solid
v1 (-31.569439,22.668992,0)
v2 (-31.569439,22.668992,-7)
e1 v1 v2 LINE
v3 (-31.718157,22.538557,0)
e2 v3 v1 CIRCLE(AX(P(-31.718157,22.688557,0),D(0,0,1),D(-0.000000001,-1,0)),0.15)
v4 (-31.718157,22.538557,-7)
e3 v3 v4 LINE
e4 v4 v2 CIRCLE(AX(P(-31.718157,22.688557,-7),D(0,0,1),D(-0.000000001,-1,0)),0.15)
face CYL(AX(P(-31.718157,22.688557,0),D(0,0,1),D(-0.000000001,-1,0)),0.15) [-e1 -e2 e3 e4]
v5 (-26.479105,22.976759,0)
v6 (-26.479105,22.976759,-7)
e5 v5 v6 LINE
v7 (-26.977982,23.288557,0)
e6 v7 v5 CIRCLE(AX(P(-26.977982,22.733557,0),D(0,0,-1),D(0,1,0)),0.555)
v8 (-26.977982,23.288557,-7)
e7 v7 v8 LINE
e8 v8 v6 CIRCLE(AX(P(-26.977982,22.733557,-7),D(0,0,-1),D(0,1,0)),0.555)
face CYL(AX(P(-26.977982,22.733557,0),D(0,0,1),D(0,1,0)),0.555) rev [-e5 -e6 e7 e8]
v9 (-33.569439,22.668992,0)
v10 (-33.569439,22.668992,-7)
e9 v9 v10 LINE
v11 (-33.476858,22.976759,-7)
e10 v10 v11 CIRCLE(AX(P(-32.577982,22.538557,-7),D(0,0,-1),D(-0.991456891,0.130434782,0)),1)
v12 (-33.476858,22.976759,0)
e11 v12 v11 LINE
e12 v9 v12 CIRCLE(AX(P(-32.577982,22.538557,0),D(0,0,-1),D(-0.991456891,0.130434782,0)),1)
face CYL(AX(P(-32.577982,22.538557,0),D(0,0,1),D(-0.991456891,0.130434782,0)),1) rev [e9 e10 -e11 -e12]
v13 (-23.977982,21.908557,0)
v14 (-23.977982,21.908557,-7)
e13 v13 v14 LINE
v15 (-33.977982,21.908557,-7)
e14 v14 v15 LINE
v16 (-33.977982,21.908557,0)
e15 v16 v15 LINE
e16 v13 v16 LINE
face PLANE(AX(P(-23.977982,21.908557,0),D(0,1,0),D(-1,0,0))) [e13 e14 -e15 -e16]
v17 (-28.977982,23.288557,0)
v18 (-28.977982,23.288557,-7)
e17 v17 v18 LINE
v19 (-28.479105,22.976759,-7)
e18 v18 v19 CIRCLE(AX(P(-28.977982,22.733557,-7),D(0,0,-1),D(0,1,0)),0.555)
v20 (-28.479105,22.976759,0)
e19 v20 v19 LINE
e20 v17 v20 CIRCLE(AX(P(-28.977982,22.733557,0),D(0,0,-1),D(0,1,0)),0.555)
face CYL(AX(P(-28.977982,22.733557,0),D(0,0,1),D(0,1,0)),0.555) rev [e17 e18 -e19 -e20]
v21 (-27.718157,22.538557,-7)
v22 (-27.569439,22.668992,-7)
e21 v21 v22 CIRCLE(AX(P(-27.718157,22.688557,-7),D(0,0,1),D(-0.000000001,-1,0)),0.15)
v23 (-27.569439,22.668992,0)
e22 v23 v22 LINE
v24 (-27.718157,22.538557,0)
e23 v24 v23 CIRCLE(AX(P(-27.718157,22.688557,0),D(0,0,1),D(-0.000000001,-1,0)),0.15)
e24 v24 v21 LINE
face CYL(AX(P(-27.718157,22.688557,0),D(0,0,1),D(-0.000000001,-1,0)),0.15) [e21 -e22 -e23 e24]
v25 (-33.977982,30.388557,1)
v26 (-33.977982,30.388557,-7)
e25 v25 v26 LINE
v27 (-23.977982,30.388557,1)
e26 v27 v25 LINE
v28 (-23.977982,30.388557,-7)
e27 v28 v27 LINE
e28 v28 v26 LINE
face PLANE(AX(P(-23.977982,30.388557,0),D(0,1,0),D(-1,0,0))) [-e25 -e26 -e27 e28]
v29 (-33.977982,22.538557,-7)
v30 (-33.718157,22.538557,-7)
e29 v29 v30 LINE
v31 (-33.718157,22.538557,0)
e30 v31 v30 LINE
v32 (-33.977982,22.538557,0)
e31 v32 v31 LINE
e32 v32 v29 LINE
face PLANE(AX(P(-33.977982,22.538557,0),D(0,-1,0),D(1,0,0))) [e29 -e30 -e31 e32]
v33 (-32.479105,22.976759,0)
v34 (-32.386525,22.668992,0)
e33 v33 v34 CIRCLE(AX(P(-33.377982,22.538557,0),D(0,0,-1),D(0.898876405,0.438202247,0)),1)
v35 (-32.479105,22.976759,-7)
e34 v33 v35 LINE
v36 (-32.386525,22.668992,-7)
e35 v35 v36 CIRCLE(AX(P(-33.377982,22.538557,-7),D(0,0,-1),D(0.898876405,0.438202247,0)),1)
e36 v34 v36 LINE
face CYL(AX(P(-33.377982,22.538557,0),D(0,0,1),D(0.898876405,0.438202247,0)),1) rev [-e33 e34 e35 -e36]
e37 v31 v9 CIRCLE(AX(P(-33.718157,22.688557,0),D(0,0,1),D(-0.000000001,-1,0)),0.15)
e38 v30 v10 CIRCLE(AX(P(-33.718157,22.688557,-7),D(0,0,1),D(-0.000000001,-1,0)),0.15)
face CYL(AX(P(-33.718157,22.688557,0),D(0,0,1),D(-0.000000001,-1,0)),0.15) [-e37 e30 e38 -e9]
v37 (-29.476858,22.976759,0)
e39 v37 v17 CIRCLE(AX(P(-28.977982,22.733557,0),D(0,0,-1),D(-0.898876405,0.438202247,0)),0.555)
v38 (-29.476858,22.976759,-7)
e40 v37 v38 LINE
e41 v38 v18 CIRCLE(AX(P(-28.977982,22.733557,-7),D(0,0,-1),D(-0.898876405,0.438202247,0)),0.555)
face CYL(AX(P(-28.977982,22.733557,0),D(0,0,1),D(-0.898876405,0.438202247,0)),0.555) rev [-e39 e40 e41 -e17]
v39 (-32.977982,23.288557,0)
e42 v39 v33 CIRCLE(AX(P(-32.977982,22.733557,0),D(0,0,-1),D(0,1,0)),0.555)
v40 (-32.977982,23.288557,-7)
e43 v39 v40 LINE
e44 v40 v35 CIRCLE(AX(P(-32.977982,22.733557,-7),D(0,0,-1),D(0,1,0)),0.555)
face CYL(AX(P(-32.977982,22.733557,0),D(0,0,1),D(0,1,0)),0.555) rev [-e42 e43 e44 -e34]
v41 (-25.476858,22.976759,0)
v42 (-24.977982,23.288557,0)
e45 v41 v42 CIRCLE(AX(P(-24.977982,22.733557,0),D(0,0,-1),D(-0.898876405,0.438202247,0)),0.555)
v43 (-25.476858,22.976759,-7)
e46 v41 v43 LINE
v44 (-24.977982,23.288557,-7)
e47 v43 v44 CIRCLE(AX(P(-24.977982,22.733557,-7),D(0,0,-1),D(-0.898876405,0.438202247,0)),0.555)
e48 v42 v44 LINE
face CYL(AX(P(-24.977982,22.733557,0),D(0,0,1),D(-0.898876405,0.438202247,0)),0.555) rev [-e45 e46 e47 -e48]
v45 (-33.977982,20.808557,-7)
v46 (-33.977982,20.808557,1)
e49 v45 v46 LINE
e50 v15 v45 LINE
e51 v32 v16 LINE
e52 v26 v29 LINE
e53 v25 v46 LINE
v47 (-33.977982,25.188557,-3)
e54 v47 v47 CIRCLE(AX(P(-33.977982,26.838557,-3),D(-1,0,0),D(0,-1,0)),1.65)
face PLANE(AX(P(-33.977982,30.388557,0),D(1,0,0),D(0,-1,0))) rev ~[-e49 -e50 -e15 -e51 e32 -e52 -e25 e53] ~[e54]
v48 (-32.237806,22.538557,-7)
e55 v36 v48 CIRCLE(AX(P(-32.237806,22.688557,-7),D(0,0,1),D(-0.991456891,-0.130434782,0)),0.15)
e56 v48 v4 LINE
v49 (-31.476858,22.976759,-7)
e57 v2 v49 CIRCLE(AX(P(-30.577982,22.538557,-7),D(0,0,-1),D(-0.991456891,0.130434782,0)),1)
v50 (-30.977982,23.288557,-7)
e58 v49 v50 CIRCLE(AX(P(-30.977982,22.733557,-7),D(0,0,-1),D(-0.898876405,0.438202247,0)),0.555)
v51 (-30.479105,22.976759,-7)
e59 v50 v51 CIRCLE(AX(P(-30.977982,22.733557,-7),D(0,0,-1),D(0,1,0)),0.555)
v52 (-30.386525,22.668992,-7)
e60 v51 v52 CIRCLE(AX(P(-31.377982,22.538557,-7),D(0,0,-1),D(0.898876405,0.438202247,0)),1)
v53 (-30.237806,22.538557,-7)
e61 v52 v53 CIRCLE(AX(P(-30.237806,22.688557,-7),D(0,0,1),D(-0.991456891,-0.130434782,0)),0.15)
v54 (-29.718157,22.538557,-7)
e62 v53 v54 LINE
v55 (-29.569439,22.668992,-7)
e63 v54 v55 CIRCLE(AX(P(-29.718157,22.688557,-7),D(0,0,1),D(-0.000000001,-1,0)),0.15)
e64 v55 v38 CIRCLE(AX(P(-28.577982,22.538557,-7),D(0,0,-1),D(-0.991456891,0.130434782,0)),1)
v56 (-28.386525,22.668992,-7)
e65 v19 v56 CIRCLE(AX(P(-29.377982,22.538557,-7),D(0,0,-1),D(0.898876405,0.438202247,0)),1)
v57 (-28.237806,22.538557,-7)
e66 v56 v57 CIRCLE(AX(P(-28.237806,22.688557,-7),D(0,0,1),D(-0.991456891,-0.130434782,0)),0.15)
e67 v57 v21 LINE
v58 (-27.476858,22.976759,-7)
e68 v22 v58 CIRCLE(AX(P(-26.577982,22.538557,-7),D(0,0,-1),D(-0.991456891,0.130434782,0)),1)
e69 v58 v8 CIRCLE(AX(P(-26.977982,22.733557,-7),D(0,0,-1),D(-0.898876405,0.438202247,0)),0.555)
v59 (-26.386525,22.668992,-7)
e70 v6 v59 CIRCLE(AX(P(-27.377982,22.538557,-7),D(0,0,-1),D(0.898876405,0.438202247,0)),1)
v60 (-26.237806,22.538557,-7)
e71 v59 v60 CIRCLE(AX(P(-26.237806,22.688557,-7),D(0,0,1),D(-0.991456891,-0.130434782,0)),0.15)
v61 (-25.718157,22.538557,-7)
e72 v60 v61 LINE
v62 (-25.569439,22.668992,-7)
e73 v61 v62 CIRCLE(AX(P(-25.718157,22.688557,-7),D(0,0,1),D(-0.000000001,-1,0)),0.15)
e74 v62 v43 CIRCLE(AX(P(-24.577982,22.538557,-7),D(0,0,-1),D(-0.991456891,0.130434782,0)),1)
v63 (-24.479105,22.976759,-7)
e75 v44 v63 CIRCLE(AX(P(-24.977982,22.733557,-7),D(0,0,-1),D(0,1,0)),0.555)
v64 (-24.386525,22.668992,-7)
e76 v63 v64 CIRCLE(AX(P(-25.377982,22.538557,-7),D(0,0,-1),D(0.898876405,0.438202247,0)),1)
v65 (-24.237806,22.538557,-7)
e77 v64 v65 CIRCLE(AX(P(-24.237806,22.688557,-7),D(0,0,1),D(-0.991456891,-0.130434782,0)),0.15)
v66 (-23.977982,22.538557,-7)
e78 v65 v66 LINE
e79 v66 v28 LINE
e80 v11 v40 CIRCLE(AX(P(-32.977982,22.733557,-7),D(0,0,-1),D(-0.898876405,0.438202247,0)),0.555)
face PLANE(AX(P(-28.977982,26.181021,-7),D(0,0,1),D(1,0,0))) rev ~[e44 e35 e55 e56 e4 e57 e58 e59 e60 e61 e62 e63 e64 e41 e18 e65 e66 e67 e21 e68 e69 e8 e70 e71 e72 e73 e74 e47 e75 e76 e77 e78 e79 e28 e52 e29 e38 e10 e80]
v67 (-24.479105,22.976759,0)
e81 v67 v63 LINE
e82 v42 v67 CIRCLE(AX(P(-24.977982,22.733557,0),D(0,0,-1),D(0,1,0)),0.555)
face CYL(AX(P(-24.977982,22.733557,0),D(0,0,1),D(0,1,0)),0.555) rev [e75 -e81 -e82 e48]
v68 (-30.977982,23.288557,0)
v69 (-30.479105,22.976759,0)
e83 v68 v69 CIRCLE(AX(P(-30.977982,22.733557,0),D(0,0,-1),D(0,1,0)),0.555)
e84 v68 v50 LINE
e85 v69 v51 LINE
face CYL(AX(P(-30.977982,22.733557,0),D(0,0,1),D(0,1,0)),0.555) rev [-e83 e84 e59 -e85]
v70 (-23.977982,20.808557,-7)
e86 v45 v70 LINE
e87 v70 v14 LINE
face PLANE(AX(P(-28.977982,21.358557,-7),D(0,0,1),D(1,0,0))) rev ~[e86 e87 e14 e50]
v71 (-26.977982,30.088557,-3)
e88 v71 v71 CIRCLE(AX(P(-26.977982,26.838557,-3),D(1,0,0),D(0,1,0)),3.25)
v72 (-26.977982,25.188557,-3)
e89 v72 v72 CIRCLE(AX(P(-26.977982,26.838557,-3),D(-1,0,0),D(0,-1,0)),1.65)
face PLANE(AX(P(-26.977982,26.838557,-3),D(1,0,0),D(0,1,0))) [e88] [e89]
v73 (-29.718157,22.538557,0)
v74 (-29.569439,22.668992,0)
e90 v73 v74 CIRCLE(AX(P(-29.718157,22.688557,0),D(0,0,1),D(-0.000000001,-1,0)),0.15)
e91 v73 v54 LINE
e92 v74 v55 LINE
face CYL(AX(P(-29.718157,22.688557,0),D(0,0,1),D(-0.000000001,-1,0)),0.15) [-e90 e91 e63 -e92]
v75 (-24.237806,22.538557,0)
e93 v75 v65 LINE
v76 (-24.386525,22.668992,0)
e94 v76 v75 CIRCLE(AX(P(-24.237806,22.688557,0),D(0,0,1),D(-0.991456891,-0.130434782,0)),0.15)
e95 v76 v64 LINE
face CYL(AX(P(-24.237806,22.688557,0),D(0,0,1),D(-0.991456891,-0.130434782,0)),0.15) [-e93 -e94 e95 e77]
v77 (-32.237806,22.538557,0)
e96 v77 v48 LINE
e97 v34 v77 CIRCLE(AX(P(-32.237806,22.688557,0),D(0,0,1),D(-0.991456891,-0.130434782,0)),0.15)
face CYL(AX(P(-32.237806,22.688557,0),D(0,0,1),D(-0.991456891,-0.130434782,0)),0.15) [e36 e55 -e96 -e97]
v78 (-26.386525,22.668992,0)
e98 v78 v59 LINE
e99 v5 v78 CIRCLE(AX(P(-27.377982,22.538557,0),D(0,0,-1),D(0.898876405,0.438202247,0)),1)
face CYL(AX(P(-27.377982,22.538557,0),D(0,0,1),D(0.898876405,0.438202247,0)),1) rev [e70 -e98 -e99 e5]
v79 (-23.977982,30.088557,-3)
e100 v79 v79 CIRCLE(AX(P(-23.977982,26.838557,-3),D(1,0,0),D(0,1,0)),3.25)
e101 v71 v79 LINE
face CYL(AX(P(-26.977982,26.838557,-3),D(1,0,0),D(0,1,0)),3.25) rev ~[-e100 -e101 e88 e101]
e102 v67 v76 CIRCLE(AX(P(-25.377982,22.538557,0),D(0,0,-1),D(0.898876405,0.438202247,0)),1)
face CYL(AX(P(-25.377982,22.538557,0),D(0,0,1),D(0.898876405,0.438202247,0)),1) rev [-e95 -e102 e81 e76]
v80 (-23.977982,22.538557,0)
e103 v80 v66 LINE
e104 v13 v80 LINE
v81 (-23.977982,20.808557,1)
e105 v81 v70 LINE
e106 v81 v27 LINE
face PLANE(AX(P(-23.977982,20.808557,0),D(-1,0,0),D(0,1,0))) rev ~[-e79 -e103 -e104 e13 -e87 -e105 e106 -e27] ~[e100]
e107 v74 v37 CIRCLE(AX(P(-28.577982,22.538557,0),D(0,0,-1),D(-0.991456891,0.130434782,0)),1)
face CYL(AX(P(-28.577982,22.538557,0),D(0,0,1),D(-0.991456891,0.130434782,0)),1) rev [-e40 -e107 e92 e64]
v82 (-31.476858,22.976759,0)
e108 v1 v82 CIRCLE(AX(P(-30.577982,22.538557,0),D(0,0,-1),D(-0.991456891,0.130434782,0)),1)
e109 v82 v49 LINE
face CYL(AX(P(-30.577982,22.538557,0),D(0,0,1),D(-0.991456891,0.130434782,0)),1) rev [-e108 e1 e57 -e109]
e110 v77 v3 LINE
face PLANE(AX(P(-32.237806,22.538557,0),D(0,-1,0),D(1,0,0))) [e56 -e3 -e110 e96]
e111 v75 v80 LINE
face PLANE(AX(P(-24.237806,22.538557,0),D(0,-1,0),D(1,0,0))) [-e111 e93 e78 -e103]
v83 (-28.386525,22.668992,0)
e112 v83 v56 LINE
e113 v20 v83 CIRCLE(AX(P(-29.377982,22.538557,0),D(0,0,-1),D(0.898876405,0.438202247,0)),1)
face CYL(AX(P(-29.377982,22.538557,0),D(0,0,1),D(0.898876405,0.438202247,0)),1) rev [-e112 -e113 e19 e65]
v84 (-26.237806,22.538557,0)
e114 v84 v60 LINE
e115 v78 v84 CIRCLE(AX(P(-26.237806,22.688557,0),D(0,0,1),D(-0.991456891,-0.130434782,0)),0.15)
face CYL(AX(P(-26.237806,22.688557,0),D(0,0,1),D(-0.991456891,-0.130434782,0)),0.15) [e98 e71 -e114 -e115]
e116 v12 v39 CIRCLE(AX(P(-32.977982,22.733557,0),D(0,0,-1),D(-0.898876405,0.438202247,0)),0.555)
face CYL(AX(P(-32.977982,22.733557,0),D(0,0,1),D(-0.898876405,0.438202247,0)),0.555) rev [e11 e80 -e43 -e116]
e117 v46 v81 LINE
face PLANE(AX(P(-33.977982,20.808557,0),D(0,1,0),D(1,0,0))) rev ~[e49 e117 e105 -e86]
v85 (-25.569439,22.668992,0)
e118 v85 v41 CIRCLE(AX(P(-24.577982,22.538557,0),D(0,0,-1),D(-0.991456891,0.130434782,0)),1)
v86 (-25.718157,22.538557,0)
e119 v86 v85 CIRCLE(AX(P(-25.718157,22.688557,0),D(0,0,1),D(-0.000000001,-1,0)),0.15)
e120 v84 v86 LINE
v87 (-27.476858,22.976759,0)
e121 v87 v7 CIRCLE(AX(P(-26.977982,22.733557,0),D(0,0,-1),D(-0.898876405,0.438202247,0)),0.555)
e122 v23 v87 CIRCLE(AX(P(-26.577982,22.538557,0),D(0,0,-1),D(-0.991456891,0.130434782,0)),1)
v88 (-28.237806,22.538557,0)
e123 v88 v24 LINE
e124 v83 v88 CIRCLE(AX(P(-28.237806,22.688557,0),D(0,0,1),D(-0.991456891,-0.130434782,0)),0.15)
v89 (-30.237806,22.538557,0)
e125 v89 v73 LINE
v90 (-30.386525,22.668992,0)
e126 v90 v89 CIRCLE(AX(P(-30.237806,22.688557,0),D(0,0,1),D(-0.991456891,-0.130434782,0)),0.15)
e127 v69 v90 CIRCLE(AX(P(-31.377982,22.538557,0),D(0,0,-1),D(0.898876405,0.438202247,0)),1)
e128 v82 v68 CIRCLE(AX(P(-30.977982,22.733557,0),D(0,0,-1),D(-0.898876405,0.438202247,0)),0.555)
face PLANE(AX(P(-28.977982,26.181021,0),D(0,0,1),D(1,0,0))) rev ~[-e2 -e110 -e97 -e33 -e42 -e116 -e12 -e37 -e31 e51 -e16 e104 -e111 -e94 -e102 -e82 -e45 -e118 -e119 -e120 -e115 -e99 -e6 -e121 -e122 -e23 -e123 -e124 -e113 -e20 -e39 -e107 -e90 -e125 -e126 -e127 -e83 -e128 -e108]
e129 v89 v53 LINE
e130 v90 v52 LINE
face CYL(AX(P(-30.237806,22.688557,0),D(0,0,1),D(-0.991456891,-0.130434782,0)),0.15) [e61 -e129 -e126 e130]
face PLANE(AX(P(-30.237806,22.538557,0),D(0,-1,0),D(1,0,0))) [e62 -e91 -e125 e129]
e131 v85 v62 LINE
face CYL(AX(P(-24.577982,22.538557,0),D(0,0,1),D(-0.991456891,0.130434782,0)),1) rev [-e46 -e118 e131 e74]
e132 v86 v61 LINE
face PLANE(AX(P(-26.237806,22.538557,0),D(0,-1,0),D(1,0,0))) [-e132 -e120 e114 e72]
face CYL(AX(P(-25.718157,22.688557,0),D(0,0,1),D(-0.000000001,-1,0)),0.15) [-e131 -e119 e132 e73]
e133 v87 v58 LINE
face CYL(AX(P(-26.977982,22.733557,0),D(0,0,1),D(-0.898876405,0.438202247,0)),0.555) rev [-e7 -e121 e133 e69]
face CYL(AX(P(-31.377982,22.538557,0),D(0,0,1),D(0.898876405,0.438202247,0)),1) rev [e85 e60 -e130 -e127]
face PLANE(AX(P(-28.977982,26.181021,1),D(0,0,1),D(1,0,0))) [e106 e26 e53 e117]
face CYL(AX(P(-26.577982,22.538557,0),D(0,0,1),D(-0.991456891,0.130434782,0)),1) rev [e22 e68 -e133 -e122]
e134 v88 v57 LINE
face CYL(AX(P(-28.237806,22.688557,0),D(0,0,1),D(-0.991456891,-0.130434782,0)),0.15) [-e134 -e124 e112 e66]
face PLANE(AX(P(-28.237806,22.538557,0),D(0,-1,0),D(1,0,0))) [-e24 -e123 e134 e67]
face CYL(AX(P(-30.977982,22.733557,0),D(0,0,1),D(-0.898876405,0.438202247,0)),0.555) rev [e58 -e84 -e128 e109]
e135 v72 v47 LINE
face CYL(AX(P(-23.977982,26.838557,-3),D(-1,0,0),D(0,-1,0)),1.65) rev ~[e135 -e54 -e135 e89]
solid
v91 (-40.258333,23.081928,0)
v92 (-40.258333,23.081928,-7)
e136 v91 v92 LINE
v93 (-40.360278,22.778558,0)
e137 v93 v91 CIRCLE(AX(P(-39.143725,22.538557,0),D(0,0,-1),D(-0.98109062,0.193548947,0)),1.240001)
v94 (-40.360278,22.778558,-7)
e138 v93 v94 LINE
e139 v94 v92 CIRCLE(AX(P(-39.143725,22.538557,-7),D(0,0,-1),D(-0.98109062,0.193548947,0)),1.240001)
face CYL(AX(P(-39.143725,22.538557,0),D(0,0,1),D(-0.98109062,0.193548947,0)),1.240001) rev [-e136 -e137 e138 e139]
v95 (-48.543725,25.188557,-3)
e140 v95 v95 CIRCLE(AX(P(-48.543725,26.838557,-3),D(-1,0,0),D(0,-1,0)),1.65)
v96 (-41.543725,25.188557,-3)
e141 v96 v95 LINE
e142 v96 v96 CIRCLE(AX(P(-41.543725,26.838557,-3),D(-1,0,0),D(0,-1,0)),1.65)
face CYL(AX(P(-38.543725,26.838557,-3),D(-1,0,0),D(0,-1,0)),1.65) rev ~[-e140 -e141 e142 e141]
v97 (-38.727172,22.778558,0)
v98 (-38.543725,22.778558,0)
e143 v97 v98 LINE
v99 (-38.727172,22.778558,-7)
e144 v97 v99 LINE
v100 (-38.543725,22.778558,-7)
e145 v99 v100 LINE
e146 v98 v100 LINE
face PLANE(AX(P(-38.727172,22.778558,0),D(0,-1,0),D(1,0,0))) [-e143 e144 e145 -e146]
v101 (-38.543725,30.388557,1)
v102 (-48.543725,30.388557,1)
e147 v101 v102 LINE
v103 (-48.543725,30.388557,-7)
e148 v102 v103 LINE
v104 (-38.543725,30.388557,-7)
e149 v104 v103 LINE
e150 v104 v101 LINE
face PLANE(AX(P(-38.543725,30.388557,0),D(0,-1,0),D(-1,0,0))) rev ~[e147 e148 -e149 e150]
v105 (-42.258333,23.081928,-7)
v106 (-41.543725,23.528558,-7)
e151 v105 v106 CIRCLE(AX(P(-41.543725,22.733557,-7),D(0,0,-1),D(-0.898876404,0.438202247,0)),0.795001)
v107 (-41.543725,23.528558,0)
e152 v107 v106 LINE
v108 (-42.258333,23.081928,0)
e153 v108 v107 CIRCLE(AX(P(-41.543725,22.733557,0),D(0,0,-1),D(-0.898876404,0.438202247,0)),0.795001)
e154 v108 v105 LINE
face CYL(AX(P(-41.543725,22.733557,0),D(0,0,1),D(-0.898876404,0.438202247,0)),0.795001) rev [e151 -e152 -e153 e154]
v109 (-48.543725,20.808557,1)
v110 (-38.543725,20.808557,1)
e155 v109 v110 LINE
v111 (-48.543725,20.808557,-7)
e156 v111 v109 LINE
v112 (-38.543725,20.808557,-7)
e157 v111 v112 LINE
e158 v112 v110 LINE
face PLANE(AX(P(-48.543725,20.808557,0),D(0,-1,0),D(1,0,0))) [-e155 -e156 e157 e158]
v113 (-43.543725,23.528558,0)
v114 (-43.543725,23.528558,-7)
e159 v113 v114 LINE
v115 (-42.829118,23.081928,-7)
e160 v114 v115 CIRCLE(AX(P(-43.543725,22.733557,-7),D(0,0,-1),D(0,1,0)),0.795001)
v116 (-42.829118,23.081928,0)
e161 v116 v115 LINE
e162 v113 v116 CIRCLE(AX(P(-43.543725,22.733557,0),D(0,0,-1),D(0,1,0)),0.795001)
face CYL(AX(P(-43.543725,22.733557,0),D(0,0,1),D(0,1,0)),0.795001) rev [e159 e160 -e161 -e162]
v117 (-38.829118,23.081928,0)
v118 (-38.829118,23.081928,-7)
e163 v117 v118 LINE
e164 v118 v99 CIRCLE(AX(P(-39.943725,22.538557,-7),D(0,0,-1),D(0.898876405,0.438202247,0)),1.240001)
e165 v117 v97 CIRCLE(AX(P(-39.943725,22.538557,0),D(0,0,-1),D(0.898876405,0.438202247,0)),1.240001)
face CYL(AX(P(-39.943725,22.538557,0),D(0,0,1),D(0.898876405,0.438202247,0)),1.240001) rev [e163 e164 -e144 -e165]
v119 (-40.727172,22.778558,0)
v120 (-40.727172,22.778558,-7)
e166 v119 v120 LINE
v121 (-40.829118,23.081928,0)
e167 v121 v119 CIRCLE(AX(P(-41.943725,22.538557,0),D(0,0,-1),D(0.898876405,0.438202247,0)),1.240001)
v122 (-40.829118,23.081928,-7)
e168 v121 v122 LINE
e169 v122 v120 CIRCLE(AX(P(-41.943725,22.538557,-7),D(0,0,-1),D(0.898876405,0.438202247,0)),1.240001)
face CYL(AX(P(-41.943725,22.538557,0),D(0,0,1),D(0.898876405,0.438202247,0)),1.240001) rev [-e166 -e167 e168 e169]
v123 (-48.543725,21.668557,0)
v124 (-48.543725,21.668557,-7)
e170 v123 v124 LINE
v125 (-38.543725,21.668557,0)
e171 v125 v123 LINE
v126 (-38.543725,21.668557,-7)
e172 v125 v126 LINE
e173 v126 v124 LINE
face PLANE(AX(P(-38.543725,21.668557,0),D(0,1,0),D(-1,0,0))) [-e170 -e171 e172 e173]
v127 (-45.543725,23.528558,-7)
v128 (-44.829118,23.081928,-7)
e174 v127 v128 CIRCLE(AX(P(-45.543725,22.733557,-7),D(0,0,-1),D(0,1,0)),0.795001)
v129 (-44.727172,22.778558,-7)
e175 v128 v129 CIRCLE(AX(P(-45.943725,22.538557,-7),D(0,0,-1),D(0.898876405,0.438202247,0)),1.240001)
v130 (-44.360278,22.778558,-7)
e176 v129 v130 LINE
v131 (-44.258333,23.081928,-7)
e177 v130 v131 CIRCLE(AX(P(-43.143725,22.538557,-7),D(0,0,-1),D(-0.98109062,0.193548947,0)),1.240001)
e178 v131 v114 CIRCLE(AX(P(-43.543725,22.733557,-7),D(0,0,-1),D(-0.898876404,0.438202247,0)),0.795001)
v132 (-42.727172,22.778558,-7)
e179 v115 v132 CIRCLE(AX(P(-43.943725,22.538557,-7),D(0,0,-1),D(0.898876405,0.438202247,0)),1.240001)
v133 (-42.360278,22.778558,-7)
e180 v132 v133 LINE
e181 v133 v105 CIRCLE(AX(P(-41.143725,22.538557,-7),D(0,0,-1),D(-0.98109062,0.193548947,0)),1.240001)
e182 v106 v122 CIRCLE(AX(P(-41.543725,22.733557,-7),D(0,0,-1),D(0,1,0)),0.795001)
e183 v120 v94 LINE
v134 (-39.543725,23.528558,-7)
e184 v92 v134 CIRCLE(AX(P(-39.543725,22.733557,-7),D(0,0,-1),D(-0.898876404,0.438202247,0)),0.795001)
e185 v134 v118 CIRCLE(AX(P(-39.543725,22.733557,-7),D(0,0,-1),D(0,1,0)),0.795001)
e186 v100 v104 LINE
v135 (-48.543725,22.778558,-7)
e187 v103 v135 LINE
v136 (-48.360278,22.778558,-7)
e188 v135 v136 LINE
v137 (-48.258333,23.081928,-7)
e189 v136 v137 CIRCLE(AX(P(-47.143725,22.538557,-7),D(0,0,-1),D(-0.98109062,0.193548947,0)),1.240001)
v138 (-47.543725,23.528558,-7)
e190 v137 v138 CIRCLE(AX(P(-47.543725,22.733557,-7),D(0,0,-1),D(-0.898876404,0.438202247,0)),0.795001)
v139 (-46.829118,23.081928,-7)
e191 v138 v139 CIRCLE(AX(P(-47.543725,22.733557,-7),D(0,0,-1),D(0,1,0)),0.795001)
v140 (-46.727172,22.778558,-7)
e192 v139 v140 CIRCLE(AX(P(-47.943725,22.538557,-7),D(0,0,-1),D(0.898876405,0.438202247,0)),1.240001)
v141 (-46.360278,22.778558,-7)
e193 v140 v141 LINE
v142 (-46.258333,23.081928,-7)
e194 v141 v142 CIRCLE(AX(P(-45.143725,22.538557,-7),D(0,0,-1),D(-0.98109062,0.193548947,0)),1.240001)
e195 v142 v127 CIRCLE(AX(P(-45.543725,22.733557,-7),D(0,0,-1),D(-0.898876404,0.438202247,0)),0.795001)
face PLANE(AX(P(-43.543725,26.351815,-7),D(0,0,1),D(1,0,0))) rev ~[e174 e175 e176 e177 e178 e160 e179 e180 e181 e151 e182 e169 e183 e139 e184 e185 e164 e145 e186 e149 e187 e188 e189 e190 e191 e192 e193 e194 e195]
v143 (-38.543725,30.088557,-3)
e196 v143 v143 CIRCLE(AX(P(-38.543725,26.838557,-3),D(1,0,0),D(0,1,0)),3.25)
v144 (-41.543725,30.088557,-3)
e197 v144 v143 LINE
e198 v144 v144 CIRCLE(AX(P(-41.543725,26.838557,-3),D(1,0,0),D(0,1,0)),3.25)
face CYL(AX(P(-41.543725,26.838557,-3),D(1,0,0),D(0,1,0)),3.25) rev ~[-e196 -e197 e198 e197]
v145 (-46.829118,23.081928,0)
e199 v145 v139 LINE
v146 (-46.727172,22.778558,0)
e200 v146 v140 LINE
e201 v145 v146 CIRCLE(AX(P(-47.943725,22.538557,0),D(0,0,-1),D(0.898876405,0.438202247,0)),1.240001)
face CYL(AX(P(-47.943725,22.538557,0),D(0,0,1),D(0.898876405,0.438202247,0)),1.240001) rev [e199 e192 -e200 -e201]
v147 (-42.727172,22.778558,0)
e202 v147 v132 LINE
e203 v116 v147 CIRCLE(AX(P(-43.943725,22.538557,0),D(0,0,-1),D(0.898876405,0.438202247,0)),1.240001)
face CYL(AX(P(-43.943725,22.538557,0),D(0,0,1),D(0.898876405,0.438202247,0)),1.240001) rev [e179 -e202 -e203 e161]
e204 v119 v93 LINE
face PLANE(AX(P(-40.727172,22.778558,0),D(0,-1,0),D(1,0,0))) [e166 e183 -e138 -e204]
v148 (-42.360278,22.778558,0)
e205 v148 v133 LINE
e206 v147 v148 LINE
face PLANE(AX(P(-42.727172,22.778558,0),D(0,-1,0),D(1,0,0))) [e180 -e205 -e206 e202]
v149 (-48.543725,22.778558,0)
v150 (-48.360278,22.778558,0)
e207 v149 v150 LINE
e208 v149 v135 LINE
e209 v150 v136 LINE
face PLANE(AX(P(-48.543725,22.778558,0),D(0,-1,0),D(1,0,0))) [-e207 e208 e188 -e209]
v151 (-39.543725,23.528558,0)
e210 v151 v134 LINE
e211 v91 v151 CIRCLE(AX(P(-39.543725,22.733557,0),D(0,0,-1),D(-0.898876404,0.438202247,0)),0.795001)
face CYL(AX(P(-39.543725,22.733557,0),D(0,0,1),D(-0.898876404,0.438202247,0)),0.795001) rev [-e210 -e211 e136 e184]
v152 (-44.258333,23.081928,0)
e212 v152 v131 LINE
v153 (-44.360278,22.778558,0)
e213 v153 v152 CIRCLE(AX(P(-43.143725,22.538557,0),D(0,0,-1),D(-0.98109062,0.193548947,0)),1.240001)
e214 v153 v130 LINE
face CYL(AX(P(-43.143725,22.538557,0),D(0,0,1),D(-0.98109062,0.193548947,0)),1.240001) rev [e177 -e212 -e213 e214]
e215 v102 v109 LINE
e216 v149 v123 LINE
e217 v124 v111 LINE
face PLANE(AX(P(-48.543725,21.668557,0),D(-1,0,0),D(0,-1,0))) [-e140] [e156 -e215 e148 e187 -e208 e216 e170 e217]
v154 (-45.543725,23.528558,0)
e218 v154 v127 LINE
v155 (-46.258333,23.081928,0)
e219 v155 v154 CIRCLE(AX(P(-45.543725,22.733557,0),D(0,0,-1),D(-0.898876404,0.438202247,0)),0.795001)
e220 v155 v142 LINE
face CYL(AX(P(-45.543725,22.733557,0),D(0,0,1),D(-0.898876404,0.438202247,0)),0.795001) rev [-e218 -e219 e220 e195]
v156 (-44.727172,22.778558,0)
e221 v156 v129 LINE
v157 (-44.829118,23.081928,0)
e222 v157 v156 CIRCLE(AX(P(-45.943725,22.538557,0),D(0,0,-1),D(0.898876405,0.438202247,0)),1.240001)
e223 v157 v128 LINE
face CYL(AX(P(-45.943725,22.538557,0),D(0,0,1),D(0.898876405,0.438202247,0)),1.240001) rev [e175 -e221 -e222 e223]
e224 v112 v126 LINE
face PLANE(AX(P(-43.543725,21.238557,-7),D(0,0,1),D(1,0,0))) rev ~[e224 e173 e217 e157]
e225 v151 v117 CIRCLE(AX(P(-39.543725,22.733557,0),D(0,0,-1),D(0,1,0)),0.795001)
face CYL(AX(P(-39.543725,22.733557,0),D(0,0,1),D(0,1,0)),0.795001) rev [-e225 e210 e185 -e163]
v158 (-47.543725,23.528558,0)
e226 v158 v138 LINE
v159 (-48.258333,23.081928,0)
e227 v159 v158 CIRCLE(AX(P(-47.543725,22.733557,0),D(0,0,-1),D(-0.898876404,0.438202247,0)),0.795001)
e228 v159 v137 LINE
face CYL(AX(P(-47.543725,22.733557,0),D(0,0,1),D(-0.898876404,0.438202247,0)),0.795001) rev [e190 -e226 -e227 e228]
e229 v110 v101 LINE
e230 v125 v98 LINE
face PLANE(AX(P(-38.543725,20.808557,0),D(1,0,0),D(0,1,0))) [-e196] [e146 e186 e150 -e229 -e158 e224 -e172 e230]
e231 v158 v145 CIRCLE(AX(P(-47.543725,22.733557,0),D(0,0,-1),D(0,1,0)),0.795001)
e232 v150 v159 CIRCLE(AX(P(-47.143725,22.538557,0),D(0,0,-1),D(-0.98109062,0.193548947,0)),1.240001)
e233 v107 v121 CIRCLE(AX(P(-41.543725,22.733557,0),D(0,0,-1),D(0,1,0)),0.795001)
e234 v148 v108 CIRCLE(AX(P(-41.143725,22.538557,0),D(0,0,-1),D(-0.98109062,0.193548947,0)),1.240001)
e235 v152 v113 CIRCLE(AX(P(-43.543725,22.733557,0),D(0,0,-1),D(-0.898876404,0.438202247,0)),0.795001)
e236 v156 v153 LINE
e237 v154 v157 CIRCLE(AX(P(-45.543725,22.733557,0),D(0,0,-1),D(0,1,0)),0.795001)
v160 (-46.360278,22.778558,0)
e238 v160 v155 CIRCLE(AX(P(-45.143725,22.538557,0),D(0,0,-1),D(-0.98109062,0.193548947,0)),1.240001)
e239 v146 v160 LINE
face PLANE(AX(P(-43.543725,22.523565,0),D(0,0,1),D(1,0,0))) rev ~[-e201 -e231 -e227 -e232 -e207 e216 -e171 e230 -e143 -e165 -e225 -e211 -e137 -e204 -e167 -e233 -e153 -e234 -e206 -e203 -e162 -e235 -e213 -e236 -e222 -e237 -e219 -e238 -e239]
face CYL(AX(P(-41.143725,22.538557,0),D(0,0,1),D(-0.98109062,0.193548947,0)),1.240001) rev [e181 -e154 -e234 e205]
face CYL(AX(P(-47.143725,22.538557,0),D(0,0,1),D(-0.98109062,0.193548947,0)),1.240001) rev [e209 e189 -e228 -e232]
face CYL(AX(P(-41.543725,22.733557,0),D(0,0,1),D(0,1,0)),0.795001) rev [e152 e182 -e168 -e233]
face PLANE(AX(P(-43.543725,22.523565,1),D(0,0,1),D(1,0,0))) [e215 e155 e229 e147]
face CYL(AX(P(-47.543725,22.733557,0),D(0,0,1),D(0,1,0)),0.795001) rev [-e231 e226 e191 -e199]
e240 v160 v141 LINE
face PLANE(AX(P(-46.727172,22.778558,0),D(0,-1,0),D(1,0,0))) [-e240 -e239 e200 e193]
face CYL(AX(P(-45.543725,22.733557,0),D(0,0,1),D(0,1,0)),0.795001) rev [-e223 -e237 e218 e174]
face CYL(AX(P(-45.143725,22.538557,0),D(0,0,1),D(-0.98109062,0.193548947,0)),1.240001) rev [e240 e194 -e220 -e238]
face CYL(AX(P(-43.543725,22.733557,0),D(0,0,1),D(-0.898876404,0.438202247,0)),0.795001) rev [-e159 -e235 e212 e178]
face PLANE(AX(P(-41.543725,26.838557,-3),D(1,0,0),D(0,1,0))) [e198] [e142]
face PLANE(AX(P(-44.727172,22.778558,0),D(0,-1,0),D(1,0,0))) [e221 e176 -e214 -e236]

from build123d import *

# Parameters (mm, degrees)
F1_DEPTH       = 1
F2_DEPTH       = 7
F4_D           = 3.3
F4_CBORE_D     = 6.5
F4_CBORE_DEPTH = 3
F6_D           = 3.3
F6_CBORE_D     = 6.5
F6_CBORE_DEPTH = 3


# Not quite as in the source:
# - a feature names something its author has since deleted; it is built from what else it names


with BuildPart() as f1:
    # F0 (on Top) → F1 (new body)
    with BuildSketch(Plane.XY):
        with BuildLine():
            ThreePointArc((-32.9779816215, 23.288556752), (-32.6838322098, 23.2041958107), (-32.479105217, 22.9767589991))
            ThreePointArc((-32.479105217, 22.9767589991), (-32.4203699072, 22.8266189059), (-32.3865247301, 22.6689915346))
            ThreePointArc((-32.3865247301, 22.6689915346), (-32.3367132674, 22.5757853402), (-32.2378061964, 22.538556752))
            Line((-32.2378061964, 22.538556752), (-31.9779816215, 22.538556752))
            Line((-31.9779816215, 22.538556752), (-31.7181570466, 22.538556752))
            ThreePointArc((-31.7181570466, 22.538556752), (-31.6192499756, 22.5757853402), (-31.5694385129, 22.6689915346))
            ThreePointArc((-31.5694385129, 22.6689915346), (-31.5355933359, 22.8266189059), (-31.476858026, 22.9767589991))
            ThreePointArc((-31.476858026, 22.9767589991), (-31.2721310332, 23.2041958107), (-30.9779816215, 23.288556752))
            ThreePointArc((-30.9779816215, 23.288556752), (-30.6838322098, 23.2041958107), (-30.479105217, 22.9767589991))
            ThreePointArc((-30.479105217, 22.9767589991), (-30.4203699072, 22.8266189059), (-30.3865247301, 22.6689915346))
            ThreePointArc((-30.3865247301, 22.6689915346), (-30.3367132674, 22.5757853402), (-30.2378061964, 22.538556752))
            Line((-30.2378061964, 22.538556752), (-29.9779816215, 22.538556752))
            Line((-29.9779816215, 22.538556752), (-29.7181570466, 22.538556752))
            ThreePointArc((-29.7181570466, 22.538556752), (-29.6192499756, 22.5757853402), (-29.5694385129, 22.6689915346))
            ThreePointArc((-29.5694385129, 22.6689915346), (-29.5355933359, 22.8266189059), (-29.476858026, 22.9767589991))
            ThreePointArc((-29.476858026, 22.9767589991), (-29.2721310332, 23.2041958107), (-28.9779816215, 23.288556752))
            ThreePointArc((-28.9779816215, 23.288556752), (-28.6838322098, 23.2041958107), (-28.479105217, 22.9767589991))
            ThreePointArc((-28.479105217, 22.9767589991), (-28.4203699072, 22.8266189059), (-28.3865247301, 22.6689915346))
            ThreePointArc((-28.3865247301, 22.6689915346), (-28.3367132674, 22.5757853402), (-28.2378061964, 22.538556752))
            Line((-28.2378061964, 22.538556752), (-27.9779816215, 22.538556752))
            Line((-27.9779816215, 22.538556752), (-27.7181570466, 22.538556752))
            ThreePointArc((-27.7181570466, 22.538556752), (-27.6192499756, 22.5757853402), (-27.5694385129, 22.6689915346))
            ThreePointArc((-27.5694385129, 22.6689915346), (-27.5355933359, 22.8266189059), (-27.476858026, 22.9767589991))
            ThreePointArc((-27.476858026, 22.9767589991), (-27.2721310332, 23.2041958107), (-26.9779816215, 23.288556752))
            ThreePointArc((-26.9779816215, 23.288556752), (-26.6838322098, 23.2041958107), (-26.479105217, 22.9767589991))
            ThreePointArc((-26.479105217, 22.9767589991), (-26.4203699072, 22.8266189059), (-26.3865247301, 22.6689915346))
            ThreePointArc((-26.3865247301, 22.6689915346), (-26.3367132674, 22.5757853402), (-26.2378061964, 22.538556752))
            Line((-26.2378061964, 22.538556752), (-25.9779816215, 22.538556752))
            Line((-25.9779816215, 22.538556752), (-25.7181570466, 22.538556752))
            ThreePointArc((-25.7181570466, 22.538556752), (-25.6192499756, 22.5757853402), (-25.5694385129, 22.6689915346))
            ThreePointArc((-25.5694385129, 22.6689915346), (-25.5355933359, 22.8266189059), (-25.476858026, 22.9767589991))
            ThreePointArc((-25.476858026, 22.9767589991), (-25.2721310332, 23.2041958107), (-24.9779816215, 23.288556752))
            ThreePointArc((-24.9779816215, 23.288556752), (-24.6838322098, 23.2041958107), (-24.479105217, 22.9767589991))
            ThreePointArc((-24.479105217, 22.9767589991), (-24.4203699072, 22.8266189059), (-24.3865247301, 22.6689915346))
            ThreePointArc((-24.3865247301, 22.6689915346), (-24.3367132674, 22.5757853402), (-24.2378061964, 22.538556752))
            Line((-24.2378061964, 22.538556752), (-23.9779816215, 22.538556752))
            Line((-23.9779816215, 22.538556752), (-23.9779816215, 30.388556752))
            Line((-23.9779816215, 30.388556752), (-33.9779816215, 30.388556752))
            Line((-33.9779816215, 30.388556752), (-33.9779816215, 22.538556752))
            Line((-33.9779816215, 22.538556752), (-33.7181570466, 22.538556752))
            ThreePointArc((-33.7181570466, 22.538556752), (-33.6192499756, 22.5757853402), (-33.5694385129, 22.6689915346))
            ThreePointArc((-33.5694385129, 22.6689915346), (-33.5355933359, 22.8266189059), (-33.476858026, 22.9767589991))
            ThreePointArc((-33.476858026, 22.9767589991), (-33.2721310332, 23.2041958107), (-32.9779816215, 23.288556752))
        make_face()
        with BuildLine():
            ThreePointArc((-32.3865247301, 22.6689915346), (-32.4203699072, 22.8266189059), (-32.479105217, 22.9767589991))
            ThreePointArc((-32.479105217, 22.9767589991), (-32.6838322098, 23.2041958107), (-32.9779816215, 23.288556752))
            ThreePointArc((-32.9779816215, 23.288556752), (-33.2721310332, 23.2041958107), (-33.476858026, 22.9767589991))
            ThreePointArc((-33.476858026, 22.9767589991), (-33.5355933359, 22.8266189059), (-33.5694385129, 22.6689915346))
            ThreePointArc((-33.5694385129, 22.6689915346), (-33.6192499756, 22.5757853402), (-33.7181570466, 22.538556752))
            Line((-33.7181570466, 22.538556752), (-33.9779816215, 22.538556752))
            Line((-33.9779816215, 22.538556752), (-33.9779816215, 21.908556752))
            Line((-33.9779816215, 21.908556752), (-31.9779816215, 21.908556752))
            Line((-31.9779816215, 21.908556752), (-29.9779816215, 21.908556752))
            Line((-29.9779816215, 21.908556752), (-27.9779816215, 21.908556752))
            Line((-27.9779816215, 21.908556752), (-25.9779816215, 21.908556752))
            Line((-25.9779816215, 21.908556752), (-23.9779816215, 21.908556752))
            Line((-23.9779816215, 21.908556752), (-23.9779816215, 22.538556752))
            Line((-23.9779816215, 22.538556752), (-24.2378061964, 22.538556752))
            ThreePointArc((-24.2378061964, 22.538556752), (-24.3367132674, 22.5757853402), (-24.3865247301, 22.6689915346))
            ThreePointArc((-24.3865247301, 22.6689915346), (-24.4203699072, 22.8266189059), (-24.479105217, 22.9767589991))
            ThreePointArc((-24.479105217, 22.9767589991), (-24.6838322098, 23.2041958107), (-24.9779816215, 23.288556752))
            ThreePointArc((-24.9779816215, 23.288556752), (-25.2721310332, 23.2041958107), (-25.476858026, 22.9767589991))
            ThreePointArc((-25.476858026, 22.9767589991), (-25.5355933359, 22.8266189059), (-25.5694385129, 22.6689915346))
            ThreePointArc((-25.5694385129, 22.6689915346), (-25.6192499756, 22.5757853402), (-25.7181570466, 22.538556752))
            Line((-25.7181570466, 22.538556752), (-25.9779816215, 22.538556752))
            Line((-25.9779816215, 22.538556752), (-26.2378061964, 22.538556752))
            ThreePointArc((-26.2378061964, 22.538556752), (-26.3367132674, 22.5757853402), (-26.3865247301, 22.6689915346))
            ThreePointArc((-26.3865247301, 22.6689915346), (-26.4203699072, 22.8266189059), (-26.479105217, 22.9767589991))
            ThreePointArc((-26.479105217, 22.9767589991), (-26.6838322098, 23.2041958107), (-26.9779816215, 23.288556752))
            ThreePointArc((-26.9779816215, 23.288556752), (-27.2721310332, 23.2041958107), (-27.476858026, 22.9767589991))
            ThreePointArc((-27.476858026, 22.9767589991), (-27.5355933359, 22.8266189059), (-27.5694385129, 22.6689915346))
            ThreePointArc((-27.5694385129, 22.6689915346), (-27.6192499756, 22.5757853402), (-27.7181570466, 22.538556752))
            Line((-27.7181570466, 22.538556752), (-27.9779816215, 22.538556752))
            Line((-27.9779816215, 22.538556752), (-28.2378061964, 22.538556752))
            ThreePointArc((-28.2378061964, 22.538556752), (-28.3367132674, 22.5757853402), (-28.3865247301, 22.6689915346))
            ThreePointArc((-28.3865247301, 22.6689915346), (-28.4203699072, 22.8266189059), (-28.479105217, 22.9767589991))
            ThreePointArc((-28.479105217, 22.9767589991), (-28.6838322098, 23.2041958107), (-28.9779816215, 23.288556752))
            ThreePointArc((-28.9779816215, 23.288556752), (-29.2721310332, 23.2041958107), (-29.476858026, 22.9767589991))
            ThreePointArc((-29.476858026, 22.9767589991), (-29.5355933359, 22.8266189059), (-29.5694385129, 22.6689915346))
            ThreePointArc((-29.5694385129, 22.6689915346), (-29.6192499756, 22.5757853402), (-29.7181570466, 22.538556752))
            Line((-29.7181570466, 22.538556752), (-29.9779816215, 22.538556752))
            Line((-29.9779816215, 22.538556752), (-30.2378061964, 22.538556752))
            ThreePointArc((-30.2378061964, 22.538556752), (-30.3367132674, 22.5757853402), (-30.3865247301, 22.6689915346))
            ThreePointArc((-30.3865247301, 22.6689915346), (-30.4203699072, 22.8266189059), (-30.479105217, 22.9767589991))
            ThreePointArc((-30.479105217, 22.9767589991), (-30.6838322098, 23.2041958107), (-30.9779816215, 23.288556752))
            ThreePointArc((-30.9779816215, 23.288556752), (-31.2721310332, 23.2041958107), (-31.476858026, 22.9767589991))
            ThreePointArc((-31.476858026, 22.9767589991), (-31.5355933359, 22.8266189059), (-31.5694385129, 22.6689915346))
            ThreePointArc((-31.5694385129, 22.6689915346), (-31.6192499756, 22.5757853402), (-31.7181570466, 22.538556752))
            Line((-31.7181570466, 22.538556752), (-31.9779816215, 22.538556752))
            Line((-31.9779816215, 22.538556752), (-32.2378061964, 22.538556752))
            ThreePointArc((-32.2378061964, 22.538556752), (-32.3367132674, 22.5757853402), (-32.3865247301, 22.6689915346))
        make_face()
        Polygon((-31.9779816215, 21.908556752), (-33.9779816215, 21.908556752), (-33.9779816215, 20.808556752), (-23.9779816215, 20.808556752), (-23.9779816215, 21.908556752), (-25.9779816215, 21.908556752), (-27.9779816215, 21.908556752), (-29.9779816215, 21.908556752), align=None)
    extrude(amount=F1_DEPTH)

    # F0 (on Top) → F2 (join)
    with BuildSketch(Plane.XY):
        with BuildLine():
            ThreePointArc((-32.9779816215, 23.288556752), (-32.6838322098, 23.2041958107), (-32.479105217, 22.9767589991))
            ThreePointArc((-32.479105217, 22.9767589991), (-32.4203699072, 22.8266189059), (-32.3865247301, 22.6689915346))
            ThreePointArc((-32.3865247301, 22.6689915346), (-32.3367132674, 22.5757853402), (-32.2378061964, 22.538556752))
            Line((-32.2378061964, 22.538556752), (-31.9779816215, 22.538556752))
            Line((-31.9779816215, 22.538556752), (-31.7181570466, 22.538556752))
            ThreePointArc((-31.7181570466, 22.538556752), (-31.6192499756, 22.5757853402), (-31.5694385129, 22.6689915346))
            ThreePointArc((-31.5694385129, 22.6689915346), (-31.5355933359, 22.8266189059), (-31.476858026, 22.9767589991))
            ThreePointArc((-31.476858026, 22.9767589991), (-31.2721310332, 23.2041958107), (-30.9779816215, 23.288556752))
            ThreePointArc((-30.9779816215, 23.288556752), (-30.6838322098, 23.2041958107), (-30.479105217, 22.9767589991))
            ThreePointArc((-30.479105217, 22.9767589991), (-30.4203699072, 22.8266189059), (-30.3865247301, 22.6689915346))
            ThreePointArc((-30.3865247301, 22.6689915346), (-30.3367132674, 22.5757853402), (-30.2378061964, 22.538556752))
            Line((-30.2378061964, 22.538556752), (-29.9779816215, 22.538556752))
            Line((-29.9779816215, 22.538556752), (-29.7181570466, 22.538556752))
            ThreePointArc((-29.7181570466, 22.538556752), (-29.6192499756, 22.5757853402), (-29.5694385129, 22.6689915346))
            ThreePointArc((-29.5694385129, 22.6689915346), (-29.5355933359, 22.8266189059), (-29.476858026, 22.9767589991))
            ThreePointArc((-29.476858026, 22.9767589991), (-29.2721310332, 23.2041958107), (-28.9779816215, 23.288556752))
            ThreePointArc((-28.9779816215, 23.288556752), (-28.6838322098, 23.2041958107), (-28.479105217, 22.9767589991))
            ThreePointArc((-28.479105217, 22.9767589991), (-28.4203699072, 22.8266189059), (-28.3865247301, 22.6689915346))
            ThreePointArc((-28.3865247301, 22.6689915346), (-28.3367132674, 22.5757853402), (-28.2378061964, 22.538556752))
            Line((-28.2378061964, 22.538556752), (-27.9779816215, 22.538556752))
            Line((-27.9779816215, 22.538556752), (-27.7181570466, 22.538556752))
            ThreePointArc((-27.7181570466, 22.538556752), (-27.6192499756, 22.5757853402), (-27.5694385129, 22.6689915346))
            ThreePointArc((-27.5694385129, 22.6689915346), (-27.5355933359, 22.8266189059), (-27.476858026, 22.9767589991))
            ThreePointArc((-27.476858026, 22.9767589991), (-27.2721310332, 23.2041958107), (-26.9779816215, 23.288556752))
            ThreePointArc((-26.9779816215, 23.288556752), (-26.6838322098, 23.2041958107), (-26.479105217, 22.9767589991))
            ThreePointArc((-26.479105217, 22.9767589991), (-26.4203699072, 22.8266189059), (-26.3865247301, 22.6689915346))
            ThreePointArc((-26.3865247301, 22.6689915346), (-26.3367132674, 22.5757853402), (-26.2378061964, 22.538556752))
            Line((-26.2378061964, 22.538556752), (-25.9779816215, 22.538556752))
            Line((-25.9779816215, 22.538556752), (-25.7181570466, 22.538556752))
            ThreePointArc((-25.7181570466, 22.538556752), (-25.6192499756, 22.5757853402), (-25.5694385129, 22.6689915346))
            ThreePointArc((-25.5694385129, 22.6689915346), (-25.5355933359, 22.8266189059), (-25.476858026, 22.9767589991))
            ThreePointArc((-25.476858026, 22.9767589991), (-25.2721310332, 23.2041958107), (-24.9779816215, 23.288556752))
            ThreePointArc((-24.9779816215, 23.288556752), (-24.6838322098, 23.2041958107), (-24.479105217, 22.9767589991))
            ThreePointArc((-24.479105217, 22.9767589991), (-24.4203699072, 22.8266189059), (-24.3865247301, 22.6689915346))
            ThreePointArc((-24.3865247301, 22.6689915346), (-24.3367132674, 22.5757853402), (-24.2378061964, 22.538556752))
            Line((-24.2378061964, 22.538556752), (-23.9779816215, 22.538556752))
            Line((-23.9779816215, 22.538556752), (-23.9779816215, 30.388556752))
            Line((-23.9779816215, 30.388556752), (-33.9779816215, 30.388556752))
            Line((-33.9779816215, 30.388556752), (-33.9779816215, 22.538556752))
            Line((-33.9779816215, 22.538556752), (-33.7181570466, 22.538556752))
            ThreePointArc((-33.7181570466, 22.538556752), (-33.6192499756, 22.5757853402), (-33.5694385129, 22.6689915346))
            ThreePointArc((-33.5694385129, 22.6689915346), (-33.5355933359, 22.8266189059), (-33.476858026, 22.9767589991))
            ThreePointArc((-33.476858026, 22.9767589991), (-33.2721310332, 23.2041958107), (-32.9779816215, 23.288556752))
        make_face()
        Polygon((-31.9779816215, 21.908556752), (-33.9779816215, 21.908556752), (-33.9779816215, 20.808556752), (-23.9779816215, 20.808556752), (-23.9779816215, 21.908556752), (-25.9779816215, 21.908556752), (-27.9779816215, 21.908556752), (-29.9779816215, 21.908556752), align=None)
    extrude(amount=-F2_DEPTH)

    # F4 (through all)
    with Locations(Plane.YZ.offset(-23.9779816215)):
        with Locations((26.838556752, -3)):
            CounterBoreHole(F4_D / 2, F4_CBORE_D / 2, F4_CBORE_DEPTH)


with BuildPart() as f1b:
    # F0 (on Top) → F1, piece 2 (new body)
    with BuildSketch(Plane.XY):
        with BuildLine():
            Line((-48.5437250639, 22.7785576135), (-48.5437250639, 21.668556752))
            Line((-48.5437250639, 21.668556752), (-46.5437250639, 21.668556752))
            Line((-46.5437250639, 21.668556752), (-44.5437250639, 21.668556752))
            Line((-44.5437250639, 21.668556752), (-42.5437250639, 21.668556752))
            Line((-42.5437250639, 21.668556752), (-40.5437250639, 21.668556752))
            Line((-40.5437250639, 21.668556752), (-38.5437250639, 21.668556752))
            Line((-38.5437250639, 21.668556752), (-38.5437250639, 22.7785576135))
            Line((-38.5437250639, 22.7785576135), (-38.7271718496, 22.7785576135))
            ThreePointArc((-38.7271718496, 22.7785576135), (-38.7683162105, 22.9335455669), (-38.8291175479, 23.081927916))
            ThreePointArc((-38.8291175479, 23.081927916), (-39.1223754499, 23.4077161342), (-39.5437250639, 23.5285576135))
            ThreePointArc((-39.5437250639, 23.5285576135), (-39.9650746778, 23.4077161342), (-40.2583325799, 23.081927916))
            ThreePointArc((-40.2583325799, 23.081927916), (-40.3191339173, 22.9335455669), (-40.3602782781, 22.7785576135))
            Line((-40.3602782781, 22.7785576135), (-40.5437250639, 22.7785576135))
            Line((-40.5437250639, 22.7785576135), (-40.7271718496, 22.7785576135))
            ThreePointArc((-40.7271718496, 22.7785576135), (-40.7683162105, 22.9335455669), (-40.8291175479, 23.081927916))
            ThreePointArc((-40.8291175479, 23.081927916), (-41.1223754499, 23.4077161342), (-41.5437250639, 23.5285576135))
            ThreePointArc((-41.5437250639, 23.5285576135), (-41.9650746778, 23.4077161342), (-42.2583325799, 23.081927916))
            ThreePointArc((-42.2583325799, 23.081927916), (-42.3191339173, 22.9335455669), (-42.3602782781, 22.7785576135))
            Line((-42.3602782781, 22.7785576135), (-42.5437250639, 22.7785576135))
            Line((-42.5437250639, 22.7785576135), (-42.7271718496, 22.7785576135))
            ThreePointArc((-42.7271718496, 22.7785576135), (-42.7683162105, 22.9335455669), (-42.8291175479, 23.081927916))
            ThreePointArc((-42.8291175479, 23.081927916), (-43.1223754499, 23.4077161342), (-43.5437250639, 23.5285576135))
            ThreePointArc((-43.5437250639, 23.5285576135), (-43.9650746778, 23.4077161342), (-44.2583325799, 23.081927916))
            ThreePointArc((-44.2583325799, 23.081927916), (-44.3191339173, 22.9335455669), (-44.3602782781, 22.7785576135))
            Line((-44.3602782781, 22.7785576135), (-44.5437250639, 22.7785576135))
            Line((-44.5437250639, 22.7785576135), (-44.7271718496, 22.7785576135))
            ThreePointArc((-44.7271718496, 22.7785576135), (-44.7683162105, 22.9335455669), (-44.8291175479, 23.081927916))
            ThreePointArc((-44.8291175479, 23.081927916), (-45.1223754499, 23.4077161342), (-45.5437250639, 23.5285576135))
            ThreePointArc((-45.5437250639, 23.5285576135), (-45.9650746778, 23.4077161342), (-46.2583325799, 23.081927916))
            ThreePointArc((-46.2583325799, 23.081927916), (-46.3191339173, 22.9335455669), (-46.3602782781, 22.7785576135))
            Line((-46.3602782781, 22.7785576135), (-46.5437250639, 22.7785576135))
            Line((-46.5437250639, 22.7785576135), (-46.7271718496, 22.7785576135))
            ThreePointArc((-46.7271718496, 22.7785576135), (-46.7683162105, 22.9335455669), (-46.8291175479, 23.081927916))
            ThreePointArc((-46.8291175479, 23.081927916), (-47.1223754499, 23.4077161342), (-47.5437250639, 23.5285576135))
            ThreePointArc((-47.5437250639, 23.5285576135), (-47.9650746778, 23.4077161342), (-48.2583325799, 23.081927916))
            ThreePointArc((-48.2583325799, 23.081927916), (-48.3191339173, 22.9335455669), (-48.3602782781, 22.7785576135))
            Line((-48.3602782781, 22.7785576135), (-48.5437250639, 22.7785576135))
        make_face()
        Polygon((-46.5437250639, 21.668556752), (-48.5437250639, 21.668556752), (-48.5437250639, 20.808556752), (-38.5437250639, 20.808556752), (-38.5437250639, 21.668556752), (-40.5437250639, 21.668556752), (-42.5437250639, 21.668556752), (-44.5437250639, 21.668556752), align=None)
        with BuildLine():
            Line((-48.5437250639, 30.388556752), (-48.5437250639, 22.7785576135))
            Line((-48.5437250639, 22.7785576135), (-48.3602782781, 22.7785576135))
            ThreePointArc((-48.3602782781, 22.7785576135), (-48.3191339173, 22.9335455669), (-48.2583325799, 23.081927916))
            ThreePointArc((-48.2583325799, 23.081927916), (-47.9650746778, 23.4077161342), (-47.5437250639, 23.5285576135))
            ThreePointArc((-47.5437250639, 23.5285576135), (-47.1223754499, 23.4077161342), (-46.8291175479, 23.081927916))
            ThreePointArc((-46.8291175479, 23.081927916), (-46.7683162105, 22.9335455669), (-46.7271718496, 22.7785576135))
            Line((-46.7271718496, 22.7785576135), (-46.5437250639, 22.7785576135))
            Line((-46.5437250639, 22.7785576135), (-46.3602782781, 22.7785576135))
            ThreePointArc((-46.3602782781, 22.7785576135), (-46.3191339173, 22.9335455669), (-46.2583325799, 23.081927916))
            ThreePointArc((-46.2583325799, 23.081927916), (-45.9650746778, 23.4077161342), (-45.5437250639, 23.5285576135))
            ThreePointArc((-45.5437250639, 23.5285576135), (-45.1223754499, 23.4077161342), (-44.8291175479, 23.081927916))
            ThreePointArc((-44.8291175479, 23.081927916), (-44.7683162105, 22.9335455669), (-44.7271718496, 22.7785576135))
            Line((-44.7271718496, 22.7785576135), (-44.5437250639, 22.7785576135))
            Line((-44.5437250639, 22.7785576135), (-44.3602782781, 22.7785576135))
            ThreePointArc((-44.3602782781, 22.7785576135), (-44.3191339173, 22.9335455669), (-44.2583325799, 23.081927916))
            ThreePointArc((-44.2583325799, 23.081927916), (-43.9650746778, 23.4077161342), (-43.5437250639, 23.5285576135))
            ThreePointArc((-43.5437250639, 23.5285576135), (-43.1223754499, 23.4077161342), (-42.8291175479, 23.081927916))
            ThreePointArc((-42.8291175479, 23.081927916), (-42.7683162105, 22.9335455669), (-42.7271718496, 22.7785576135))
            Line((-42.7271718496, 22.7785576135), (-42.5437250639, 22.7785576135))
            Line((-42.5437250639, 22.7785576135), (-42.3602782781, 22.7785576135))
            ThreePointArc((-42.3602782781, 22.7785576135), (-42.3191339173, 22.9335455669), (-42.2583325799, 23.081927916))
            ThreePointArc((-42.2583325799, 23.081927916), (-41.9650746778, 23.4077161342), (-41.5437250639, 23.5285576135))
            ThreePointArc((-41.5437250639, 23.5285576135), (-41.1223754499, 23.4077161342), (-40.8291175479, 23.081927916))
            ThreePointArc((-40.8291175479, 23.081927916), (-40.7683162105, 22.9335455669), (-40.7271718496, 22.7785576135))
            Line((-40.7271718496, 22.7785576135), (-40.5437250639, 22.7785576135))
            Line((-40.5437250639, 22.7785576135), (-40.3602782781, 22.7785576135))
            ThreePointArc((-40.3602782781, 22.7785576135), (-40.3191339173, 22.9335455669), (-40.2583325799, 23.081927916))
            ThreePointArc((-40.2583325799, 23.081927916), (-39.9650746778, 23.4077161342), (-39.5437250639, 23.5285576135))
            ThreePointArc((-39.5437250639, 23.5285576135), (-39.1223754499, 23.4077161342), (-38.8291175479, 23.081927916))
            ThreePointArc((-38.8291175479, 23.081927916), (-38.7683162105, 22.9335455669), (-38.7271718496, 22.7785576135))
            Line((-38.7271718496, 22.7785576135), (-38.5437250639, 22.7785576135))
            Line((-38.5437250639, 22.7785576135), (-38.5437250639, 30.388556752))
            Line((-38.5437250639, 30.388556752), (-48.5437250639, 30.388556752))
        make_face()
    extrude(amount=F1_DEPTH)

    # F0 (on Top) → F2, piece 2 (join)
    with BuildSketch(Plane.XY):
        Polygon((-46.5437250639, 21.668556752), (-48.5437250639, 21.668556752), (-48.5437250639, 20.808556752), (-38.5437250639, 20.808556752), (-38.5437250639, 21.668556752), (-40.5437250639, 21.668556752), (-42.5437250639, 21.668556752), (-44.5437250639, 21.668556752), align=None)
        with BuildLine():
            Line((-48.5437250639, 30.388556752), (-48.5437250639, 22.7785576135))
            Line((-48.5437250639, 22.7785576135), (-48.3602782781, 22.7785576135))
            ThreePointArc((-48.3602782781, 22.7785576135), (-48.3191339173, 22.9335455669), (-48.2583325799, 23.081927916))
            ThreePointArc((-48.2583325799, 23.081927916), (-47.9650746778, 23.4077161342), (-47.5437250639, 23.5285576135))
            ThreePointArc((-47.5437250639, 23.5285576135), (-47.1223754499, 23.4077161342), (-46.8291175479, 23.081927916))
            ThreePointArc((-46.8291175479, 23.081927916), (-46.7683162105, 22.9335455669), (-46.7271718496, 22.7785576135))
            Line((-46.7271718496, 22.7785576135), (-46.5437250639, 22.7785576135))
            Line((-46.5437250639, 22.7785576135), (-46.3602782781, 22.7785576135))
            ThreePointArc((-46.3602782781, 22.7785576135), (-46.3191339173, 22.9335455669), (-46.2583325799, 23.081927916))
            ThreePointArc((-46.2583325799, 23.081927916), (-45.9650746778, 23.4077161342), (-45.5437250639, 23.5285576135))
            ThreePointArc((-45.5437250639, 23.5285576135), (-45.1223754499, 23.4077161342), (-44.8291175479, 23.081927916))
            ThreePointArc((-44.8291175479, 23.081927916), (-44.7683162105, 22.9335455669), (-44.7271718496, 22.7785576135))
            Line((-44.7271718496, 22.7785576135), (-44.5437250639, 22.7785576135))
            Line((-44.5437250639, 22.7785576135), (-44.3602782781, 22.7785576135))
            ThreePointArc((-44.3602782781, 22.7785576135), (-44.3191339173, 22.9335455669), (-44.2583325799, 23.081927916))
            ThreePointArc((-44.2583325799, 23.081927916), (-43.9650746778, 23.4077161342), (-43.5437250639, 23.5285576135))
            ThreePointArc((-43.5437250639, 23.5285576135), (-43.1223754499, 23.4077161342), (-42.8291175479, 23.081927916))
            ThreePointArc((-42.8291175479, 23.081927916), (-42.7683162105, 22.9335455669), (-42.7271718496, 22.7785576135))
            Line((-42.7271718496, 22.7785576135), (-42.5437250639, 22.7785576135))
            Line((-42.5437250639, 22.7785576135), (-42.3602782781, 22.7785576135))
            ThreePointArc((-42.3602782781, 22.7785576135), (-42.3191339173, 22.9335455669), (-42.2583325799, 23.081927916))
            ThreePointArc((-42.2583325799, 23.081927916), (-41.9650746778, 23.4077161342), (-41.5437250639, 23.5285576135))
            ThreePointArc((-41.5437250639, 23.5285576135), (-41.1223754499, 23.4077161342), (-40.8291175479, 23.081927916))
            ThreePointArc((-40.8291175479, 23.081927916), (-40.7683162105, 22.9335455669), (-40.7271718496, 22.7785576135))
            Line((-40.7271718496, 22.7785576135), (-40.5437250639, 22.7785576135))
            Line((-40.5437250639, 22.7785576135), (-40.3602782781, 22.7785576135))
            ThreePointArc((-40.3602782781, 22.7785576135), (-40.3191339173, 22.9335455669), (-40.2583325799, 23.081927916))
            ThreePointArc((-40.2583325799, 23.081927916), (-39.9650746778, 23.4077161342), (-39.5437250639, 23.5285576135))
            ThreePointArc((-39.5437250639, 23.5285576135), (-39.1223754499, 23.4077161342), (-38.8291175479, 23.081927916))
            ThreePointArc((-38.8291175479, 23.081927916), (-38.7683162105, 22.9335455669), (-38.7271718496, 22.7785576135))
            Line((-38.7271718496, 22.7785576135), (-38.5437250639, 22.7785576135))
            Line((-38.5437250639, 22.7785576135), (-38.5437250639, 30.388556752))
            Line((-38.5437250639, 30.388556752), (-48.5437250639, 30.388556752))
        make_face()
    extrude(amount=-F2_DEPTH)

    # F6 (through all)
    with Locations(Plane.YZ.offset(-38.5437250639)):
        with Locations((26.838556752, -3)):
            CounterBoreHole(F6_D / 2, F6_CBORE_D / 2, F6_CBORE_DEPTH)


solid = Compound([f1.part, f1b.part])
